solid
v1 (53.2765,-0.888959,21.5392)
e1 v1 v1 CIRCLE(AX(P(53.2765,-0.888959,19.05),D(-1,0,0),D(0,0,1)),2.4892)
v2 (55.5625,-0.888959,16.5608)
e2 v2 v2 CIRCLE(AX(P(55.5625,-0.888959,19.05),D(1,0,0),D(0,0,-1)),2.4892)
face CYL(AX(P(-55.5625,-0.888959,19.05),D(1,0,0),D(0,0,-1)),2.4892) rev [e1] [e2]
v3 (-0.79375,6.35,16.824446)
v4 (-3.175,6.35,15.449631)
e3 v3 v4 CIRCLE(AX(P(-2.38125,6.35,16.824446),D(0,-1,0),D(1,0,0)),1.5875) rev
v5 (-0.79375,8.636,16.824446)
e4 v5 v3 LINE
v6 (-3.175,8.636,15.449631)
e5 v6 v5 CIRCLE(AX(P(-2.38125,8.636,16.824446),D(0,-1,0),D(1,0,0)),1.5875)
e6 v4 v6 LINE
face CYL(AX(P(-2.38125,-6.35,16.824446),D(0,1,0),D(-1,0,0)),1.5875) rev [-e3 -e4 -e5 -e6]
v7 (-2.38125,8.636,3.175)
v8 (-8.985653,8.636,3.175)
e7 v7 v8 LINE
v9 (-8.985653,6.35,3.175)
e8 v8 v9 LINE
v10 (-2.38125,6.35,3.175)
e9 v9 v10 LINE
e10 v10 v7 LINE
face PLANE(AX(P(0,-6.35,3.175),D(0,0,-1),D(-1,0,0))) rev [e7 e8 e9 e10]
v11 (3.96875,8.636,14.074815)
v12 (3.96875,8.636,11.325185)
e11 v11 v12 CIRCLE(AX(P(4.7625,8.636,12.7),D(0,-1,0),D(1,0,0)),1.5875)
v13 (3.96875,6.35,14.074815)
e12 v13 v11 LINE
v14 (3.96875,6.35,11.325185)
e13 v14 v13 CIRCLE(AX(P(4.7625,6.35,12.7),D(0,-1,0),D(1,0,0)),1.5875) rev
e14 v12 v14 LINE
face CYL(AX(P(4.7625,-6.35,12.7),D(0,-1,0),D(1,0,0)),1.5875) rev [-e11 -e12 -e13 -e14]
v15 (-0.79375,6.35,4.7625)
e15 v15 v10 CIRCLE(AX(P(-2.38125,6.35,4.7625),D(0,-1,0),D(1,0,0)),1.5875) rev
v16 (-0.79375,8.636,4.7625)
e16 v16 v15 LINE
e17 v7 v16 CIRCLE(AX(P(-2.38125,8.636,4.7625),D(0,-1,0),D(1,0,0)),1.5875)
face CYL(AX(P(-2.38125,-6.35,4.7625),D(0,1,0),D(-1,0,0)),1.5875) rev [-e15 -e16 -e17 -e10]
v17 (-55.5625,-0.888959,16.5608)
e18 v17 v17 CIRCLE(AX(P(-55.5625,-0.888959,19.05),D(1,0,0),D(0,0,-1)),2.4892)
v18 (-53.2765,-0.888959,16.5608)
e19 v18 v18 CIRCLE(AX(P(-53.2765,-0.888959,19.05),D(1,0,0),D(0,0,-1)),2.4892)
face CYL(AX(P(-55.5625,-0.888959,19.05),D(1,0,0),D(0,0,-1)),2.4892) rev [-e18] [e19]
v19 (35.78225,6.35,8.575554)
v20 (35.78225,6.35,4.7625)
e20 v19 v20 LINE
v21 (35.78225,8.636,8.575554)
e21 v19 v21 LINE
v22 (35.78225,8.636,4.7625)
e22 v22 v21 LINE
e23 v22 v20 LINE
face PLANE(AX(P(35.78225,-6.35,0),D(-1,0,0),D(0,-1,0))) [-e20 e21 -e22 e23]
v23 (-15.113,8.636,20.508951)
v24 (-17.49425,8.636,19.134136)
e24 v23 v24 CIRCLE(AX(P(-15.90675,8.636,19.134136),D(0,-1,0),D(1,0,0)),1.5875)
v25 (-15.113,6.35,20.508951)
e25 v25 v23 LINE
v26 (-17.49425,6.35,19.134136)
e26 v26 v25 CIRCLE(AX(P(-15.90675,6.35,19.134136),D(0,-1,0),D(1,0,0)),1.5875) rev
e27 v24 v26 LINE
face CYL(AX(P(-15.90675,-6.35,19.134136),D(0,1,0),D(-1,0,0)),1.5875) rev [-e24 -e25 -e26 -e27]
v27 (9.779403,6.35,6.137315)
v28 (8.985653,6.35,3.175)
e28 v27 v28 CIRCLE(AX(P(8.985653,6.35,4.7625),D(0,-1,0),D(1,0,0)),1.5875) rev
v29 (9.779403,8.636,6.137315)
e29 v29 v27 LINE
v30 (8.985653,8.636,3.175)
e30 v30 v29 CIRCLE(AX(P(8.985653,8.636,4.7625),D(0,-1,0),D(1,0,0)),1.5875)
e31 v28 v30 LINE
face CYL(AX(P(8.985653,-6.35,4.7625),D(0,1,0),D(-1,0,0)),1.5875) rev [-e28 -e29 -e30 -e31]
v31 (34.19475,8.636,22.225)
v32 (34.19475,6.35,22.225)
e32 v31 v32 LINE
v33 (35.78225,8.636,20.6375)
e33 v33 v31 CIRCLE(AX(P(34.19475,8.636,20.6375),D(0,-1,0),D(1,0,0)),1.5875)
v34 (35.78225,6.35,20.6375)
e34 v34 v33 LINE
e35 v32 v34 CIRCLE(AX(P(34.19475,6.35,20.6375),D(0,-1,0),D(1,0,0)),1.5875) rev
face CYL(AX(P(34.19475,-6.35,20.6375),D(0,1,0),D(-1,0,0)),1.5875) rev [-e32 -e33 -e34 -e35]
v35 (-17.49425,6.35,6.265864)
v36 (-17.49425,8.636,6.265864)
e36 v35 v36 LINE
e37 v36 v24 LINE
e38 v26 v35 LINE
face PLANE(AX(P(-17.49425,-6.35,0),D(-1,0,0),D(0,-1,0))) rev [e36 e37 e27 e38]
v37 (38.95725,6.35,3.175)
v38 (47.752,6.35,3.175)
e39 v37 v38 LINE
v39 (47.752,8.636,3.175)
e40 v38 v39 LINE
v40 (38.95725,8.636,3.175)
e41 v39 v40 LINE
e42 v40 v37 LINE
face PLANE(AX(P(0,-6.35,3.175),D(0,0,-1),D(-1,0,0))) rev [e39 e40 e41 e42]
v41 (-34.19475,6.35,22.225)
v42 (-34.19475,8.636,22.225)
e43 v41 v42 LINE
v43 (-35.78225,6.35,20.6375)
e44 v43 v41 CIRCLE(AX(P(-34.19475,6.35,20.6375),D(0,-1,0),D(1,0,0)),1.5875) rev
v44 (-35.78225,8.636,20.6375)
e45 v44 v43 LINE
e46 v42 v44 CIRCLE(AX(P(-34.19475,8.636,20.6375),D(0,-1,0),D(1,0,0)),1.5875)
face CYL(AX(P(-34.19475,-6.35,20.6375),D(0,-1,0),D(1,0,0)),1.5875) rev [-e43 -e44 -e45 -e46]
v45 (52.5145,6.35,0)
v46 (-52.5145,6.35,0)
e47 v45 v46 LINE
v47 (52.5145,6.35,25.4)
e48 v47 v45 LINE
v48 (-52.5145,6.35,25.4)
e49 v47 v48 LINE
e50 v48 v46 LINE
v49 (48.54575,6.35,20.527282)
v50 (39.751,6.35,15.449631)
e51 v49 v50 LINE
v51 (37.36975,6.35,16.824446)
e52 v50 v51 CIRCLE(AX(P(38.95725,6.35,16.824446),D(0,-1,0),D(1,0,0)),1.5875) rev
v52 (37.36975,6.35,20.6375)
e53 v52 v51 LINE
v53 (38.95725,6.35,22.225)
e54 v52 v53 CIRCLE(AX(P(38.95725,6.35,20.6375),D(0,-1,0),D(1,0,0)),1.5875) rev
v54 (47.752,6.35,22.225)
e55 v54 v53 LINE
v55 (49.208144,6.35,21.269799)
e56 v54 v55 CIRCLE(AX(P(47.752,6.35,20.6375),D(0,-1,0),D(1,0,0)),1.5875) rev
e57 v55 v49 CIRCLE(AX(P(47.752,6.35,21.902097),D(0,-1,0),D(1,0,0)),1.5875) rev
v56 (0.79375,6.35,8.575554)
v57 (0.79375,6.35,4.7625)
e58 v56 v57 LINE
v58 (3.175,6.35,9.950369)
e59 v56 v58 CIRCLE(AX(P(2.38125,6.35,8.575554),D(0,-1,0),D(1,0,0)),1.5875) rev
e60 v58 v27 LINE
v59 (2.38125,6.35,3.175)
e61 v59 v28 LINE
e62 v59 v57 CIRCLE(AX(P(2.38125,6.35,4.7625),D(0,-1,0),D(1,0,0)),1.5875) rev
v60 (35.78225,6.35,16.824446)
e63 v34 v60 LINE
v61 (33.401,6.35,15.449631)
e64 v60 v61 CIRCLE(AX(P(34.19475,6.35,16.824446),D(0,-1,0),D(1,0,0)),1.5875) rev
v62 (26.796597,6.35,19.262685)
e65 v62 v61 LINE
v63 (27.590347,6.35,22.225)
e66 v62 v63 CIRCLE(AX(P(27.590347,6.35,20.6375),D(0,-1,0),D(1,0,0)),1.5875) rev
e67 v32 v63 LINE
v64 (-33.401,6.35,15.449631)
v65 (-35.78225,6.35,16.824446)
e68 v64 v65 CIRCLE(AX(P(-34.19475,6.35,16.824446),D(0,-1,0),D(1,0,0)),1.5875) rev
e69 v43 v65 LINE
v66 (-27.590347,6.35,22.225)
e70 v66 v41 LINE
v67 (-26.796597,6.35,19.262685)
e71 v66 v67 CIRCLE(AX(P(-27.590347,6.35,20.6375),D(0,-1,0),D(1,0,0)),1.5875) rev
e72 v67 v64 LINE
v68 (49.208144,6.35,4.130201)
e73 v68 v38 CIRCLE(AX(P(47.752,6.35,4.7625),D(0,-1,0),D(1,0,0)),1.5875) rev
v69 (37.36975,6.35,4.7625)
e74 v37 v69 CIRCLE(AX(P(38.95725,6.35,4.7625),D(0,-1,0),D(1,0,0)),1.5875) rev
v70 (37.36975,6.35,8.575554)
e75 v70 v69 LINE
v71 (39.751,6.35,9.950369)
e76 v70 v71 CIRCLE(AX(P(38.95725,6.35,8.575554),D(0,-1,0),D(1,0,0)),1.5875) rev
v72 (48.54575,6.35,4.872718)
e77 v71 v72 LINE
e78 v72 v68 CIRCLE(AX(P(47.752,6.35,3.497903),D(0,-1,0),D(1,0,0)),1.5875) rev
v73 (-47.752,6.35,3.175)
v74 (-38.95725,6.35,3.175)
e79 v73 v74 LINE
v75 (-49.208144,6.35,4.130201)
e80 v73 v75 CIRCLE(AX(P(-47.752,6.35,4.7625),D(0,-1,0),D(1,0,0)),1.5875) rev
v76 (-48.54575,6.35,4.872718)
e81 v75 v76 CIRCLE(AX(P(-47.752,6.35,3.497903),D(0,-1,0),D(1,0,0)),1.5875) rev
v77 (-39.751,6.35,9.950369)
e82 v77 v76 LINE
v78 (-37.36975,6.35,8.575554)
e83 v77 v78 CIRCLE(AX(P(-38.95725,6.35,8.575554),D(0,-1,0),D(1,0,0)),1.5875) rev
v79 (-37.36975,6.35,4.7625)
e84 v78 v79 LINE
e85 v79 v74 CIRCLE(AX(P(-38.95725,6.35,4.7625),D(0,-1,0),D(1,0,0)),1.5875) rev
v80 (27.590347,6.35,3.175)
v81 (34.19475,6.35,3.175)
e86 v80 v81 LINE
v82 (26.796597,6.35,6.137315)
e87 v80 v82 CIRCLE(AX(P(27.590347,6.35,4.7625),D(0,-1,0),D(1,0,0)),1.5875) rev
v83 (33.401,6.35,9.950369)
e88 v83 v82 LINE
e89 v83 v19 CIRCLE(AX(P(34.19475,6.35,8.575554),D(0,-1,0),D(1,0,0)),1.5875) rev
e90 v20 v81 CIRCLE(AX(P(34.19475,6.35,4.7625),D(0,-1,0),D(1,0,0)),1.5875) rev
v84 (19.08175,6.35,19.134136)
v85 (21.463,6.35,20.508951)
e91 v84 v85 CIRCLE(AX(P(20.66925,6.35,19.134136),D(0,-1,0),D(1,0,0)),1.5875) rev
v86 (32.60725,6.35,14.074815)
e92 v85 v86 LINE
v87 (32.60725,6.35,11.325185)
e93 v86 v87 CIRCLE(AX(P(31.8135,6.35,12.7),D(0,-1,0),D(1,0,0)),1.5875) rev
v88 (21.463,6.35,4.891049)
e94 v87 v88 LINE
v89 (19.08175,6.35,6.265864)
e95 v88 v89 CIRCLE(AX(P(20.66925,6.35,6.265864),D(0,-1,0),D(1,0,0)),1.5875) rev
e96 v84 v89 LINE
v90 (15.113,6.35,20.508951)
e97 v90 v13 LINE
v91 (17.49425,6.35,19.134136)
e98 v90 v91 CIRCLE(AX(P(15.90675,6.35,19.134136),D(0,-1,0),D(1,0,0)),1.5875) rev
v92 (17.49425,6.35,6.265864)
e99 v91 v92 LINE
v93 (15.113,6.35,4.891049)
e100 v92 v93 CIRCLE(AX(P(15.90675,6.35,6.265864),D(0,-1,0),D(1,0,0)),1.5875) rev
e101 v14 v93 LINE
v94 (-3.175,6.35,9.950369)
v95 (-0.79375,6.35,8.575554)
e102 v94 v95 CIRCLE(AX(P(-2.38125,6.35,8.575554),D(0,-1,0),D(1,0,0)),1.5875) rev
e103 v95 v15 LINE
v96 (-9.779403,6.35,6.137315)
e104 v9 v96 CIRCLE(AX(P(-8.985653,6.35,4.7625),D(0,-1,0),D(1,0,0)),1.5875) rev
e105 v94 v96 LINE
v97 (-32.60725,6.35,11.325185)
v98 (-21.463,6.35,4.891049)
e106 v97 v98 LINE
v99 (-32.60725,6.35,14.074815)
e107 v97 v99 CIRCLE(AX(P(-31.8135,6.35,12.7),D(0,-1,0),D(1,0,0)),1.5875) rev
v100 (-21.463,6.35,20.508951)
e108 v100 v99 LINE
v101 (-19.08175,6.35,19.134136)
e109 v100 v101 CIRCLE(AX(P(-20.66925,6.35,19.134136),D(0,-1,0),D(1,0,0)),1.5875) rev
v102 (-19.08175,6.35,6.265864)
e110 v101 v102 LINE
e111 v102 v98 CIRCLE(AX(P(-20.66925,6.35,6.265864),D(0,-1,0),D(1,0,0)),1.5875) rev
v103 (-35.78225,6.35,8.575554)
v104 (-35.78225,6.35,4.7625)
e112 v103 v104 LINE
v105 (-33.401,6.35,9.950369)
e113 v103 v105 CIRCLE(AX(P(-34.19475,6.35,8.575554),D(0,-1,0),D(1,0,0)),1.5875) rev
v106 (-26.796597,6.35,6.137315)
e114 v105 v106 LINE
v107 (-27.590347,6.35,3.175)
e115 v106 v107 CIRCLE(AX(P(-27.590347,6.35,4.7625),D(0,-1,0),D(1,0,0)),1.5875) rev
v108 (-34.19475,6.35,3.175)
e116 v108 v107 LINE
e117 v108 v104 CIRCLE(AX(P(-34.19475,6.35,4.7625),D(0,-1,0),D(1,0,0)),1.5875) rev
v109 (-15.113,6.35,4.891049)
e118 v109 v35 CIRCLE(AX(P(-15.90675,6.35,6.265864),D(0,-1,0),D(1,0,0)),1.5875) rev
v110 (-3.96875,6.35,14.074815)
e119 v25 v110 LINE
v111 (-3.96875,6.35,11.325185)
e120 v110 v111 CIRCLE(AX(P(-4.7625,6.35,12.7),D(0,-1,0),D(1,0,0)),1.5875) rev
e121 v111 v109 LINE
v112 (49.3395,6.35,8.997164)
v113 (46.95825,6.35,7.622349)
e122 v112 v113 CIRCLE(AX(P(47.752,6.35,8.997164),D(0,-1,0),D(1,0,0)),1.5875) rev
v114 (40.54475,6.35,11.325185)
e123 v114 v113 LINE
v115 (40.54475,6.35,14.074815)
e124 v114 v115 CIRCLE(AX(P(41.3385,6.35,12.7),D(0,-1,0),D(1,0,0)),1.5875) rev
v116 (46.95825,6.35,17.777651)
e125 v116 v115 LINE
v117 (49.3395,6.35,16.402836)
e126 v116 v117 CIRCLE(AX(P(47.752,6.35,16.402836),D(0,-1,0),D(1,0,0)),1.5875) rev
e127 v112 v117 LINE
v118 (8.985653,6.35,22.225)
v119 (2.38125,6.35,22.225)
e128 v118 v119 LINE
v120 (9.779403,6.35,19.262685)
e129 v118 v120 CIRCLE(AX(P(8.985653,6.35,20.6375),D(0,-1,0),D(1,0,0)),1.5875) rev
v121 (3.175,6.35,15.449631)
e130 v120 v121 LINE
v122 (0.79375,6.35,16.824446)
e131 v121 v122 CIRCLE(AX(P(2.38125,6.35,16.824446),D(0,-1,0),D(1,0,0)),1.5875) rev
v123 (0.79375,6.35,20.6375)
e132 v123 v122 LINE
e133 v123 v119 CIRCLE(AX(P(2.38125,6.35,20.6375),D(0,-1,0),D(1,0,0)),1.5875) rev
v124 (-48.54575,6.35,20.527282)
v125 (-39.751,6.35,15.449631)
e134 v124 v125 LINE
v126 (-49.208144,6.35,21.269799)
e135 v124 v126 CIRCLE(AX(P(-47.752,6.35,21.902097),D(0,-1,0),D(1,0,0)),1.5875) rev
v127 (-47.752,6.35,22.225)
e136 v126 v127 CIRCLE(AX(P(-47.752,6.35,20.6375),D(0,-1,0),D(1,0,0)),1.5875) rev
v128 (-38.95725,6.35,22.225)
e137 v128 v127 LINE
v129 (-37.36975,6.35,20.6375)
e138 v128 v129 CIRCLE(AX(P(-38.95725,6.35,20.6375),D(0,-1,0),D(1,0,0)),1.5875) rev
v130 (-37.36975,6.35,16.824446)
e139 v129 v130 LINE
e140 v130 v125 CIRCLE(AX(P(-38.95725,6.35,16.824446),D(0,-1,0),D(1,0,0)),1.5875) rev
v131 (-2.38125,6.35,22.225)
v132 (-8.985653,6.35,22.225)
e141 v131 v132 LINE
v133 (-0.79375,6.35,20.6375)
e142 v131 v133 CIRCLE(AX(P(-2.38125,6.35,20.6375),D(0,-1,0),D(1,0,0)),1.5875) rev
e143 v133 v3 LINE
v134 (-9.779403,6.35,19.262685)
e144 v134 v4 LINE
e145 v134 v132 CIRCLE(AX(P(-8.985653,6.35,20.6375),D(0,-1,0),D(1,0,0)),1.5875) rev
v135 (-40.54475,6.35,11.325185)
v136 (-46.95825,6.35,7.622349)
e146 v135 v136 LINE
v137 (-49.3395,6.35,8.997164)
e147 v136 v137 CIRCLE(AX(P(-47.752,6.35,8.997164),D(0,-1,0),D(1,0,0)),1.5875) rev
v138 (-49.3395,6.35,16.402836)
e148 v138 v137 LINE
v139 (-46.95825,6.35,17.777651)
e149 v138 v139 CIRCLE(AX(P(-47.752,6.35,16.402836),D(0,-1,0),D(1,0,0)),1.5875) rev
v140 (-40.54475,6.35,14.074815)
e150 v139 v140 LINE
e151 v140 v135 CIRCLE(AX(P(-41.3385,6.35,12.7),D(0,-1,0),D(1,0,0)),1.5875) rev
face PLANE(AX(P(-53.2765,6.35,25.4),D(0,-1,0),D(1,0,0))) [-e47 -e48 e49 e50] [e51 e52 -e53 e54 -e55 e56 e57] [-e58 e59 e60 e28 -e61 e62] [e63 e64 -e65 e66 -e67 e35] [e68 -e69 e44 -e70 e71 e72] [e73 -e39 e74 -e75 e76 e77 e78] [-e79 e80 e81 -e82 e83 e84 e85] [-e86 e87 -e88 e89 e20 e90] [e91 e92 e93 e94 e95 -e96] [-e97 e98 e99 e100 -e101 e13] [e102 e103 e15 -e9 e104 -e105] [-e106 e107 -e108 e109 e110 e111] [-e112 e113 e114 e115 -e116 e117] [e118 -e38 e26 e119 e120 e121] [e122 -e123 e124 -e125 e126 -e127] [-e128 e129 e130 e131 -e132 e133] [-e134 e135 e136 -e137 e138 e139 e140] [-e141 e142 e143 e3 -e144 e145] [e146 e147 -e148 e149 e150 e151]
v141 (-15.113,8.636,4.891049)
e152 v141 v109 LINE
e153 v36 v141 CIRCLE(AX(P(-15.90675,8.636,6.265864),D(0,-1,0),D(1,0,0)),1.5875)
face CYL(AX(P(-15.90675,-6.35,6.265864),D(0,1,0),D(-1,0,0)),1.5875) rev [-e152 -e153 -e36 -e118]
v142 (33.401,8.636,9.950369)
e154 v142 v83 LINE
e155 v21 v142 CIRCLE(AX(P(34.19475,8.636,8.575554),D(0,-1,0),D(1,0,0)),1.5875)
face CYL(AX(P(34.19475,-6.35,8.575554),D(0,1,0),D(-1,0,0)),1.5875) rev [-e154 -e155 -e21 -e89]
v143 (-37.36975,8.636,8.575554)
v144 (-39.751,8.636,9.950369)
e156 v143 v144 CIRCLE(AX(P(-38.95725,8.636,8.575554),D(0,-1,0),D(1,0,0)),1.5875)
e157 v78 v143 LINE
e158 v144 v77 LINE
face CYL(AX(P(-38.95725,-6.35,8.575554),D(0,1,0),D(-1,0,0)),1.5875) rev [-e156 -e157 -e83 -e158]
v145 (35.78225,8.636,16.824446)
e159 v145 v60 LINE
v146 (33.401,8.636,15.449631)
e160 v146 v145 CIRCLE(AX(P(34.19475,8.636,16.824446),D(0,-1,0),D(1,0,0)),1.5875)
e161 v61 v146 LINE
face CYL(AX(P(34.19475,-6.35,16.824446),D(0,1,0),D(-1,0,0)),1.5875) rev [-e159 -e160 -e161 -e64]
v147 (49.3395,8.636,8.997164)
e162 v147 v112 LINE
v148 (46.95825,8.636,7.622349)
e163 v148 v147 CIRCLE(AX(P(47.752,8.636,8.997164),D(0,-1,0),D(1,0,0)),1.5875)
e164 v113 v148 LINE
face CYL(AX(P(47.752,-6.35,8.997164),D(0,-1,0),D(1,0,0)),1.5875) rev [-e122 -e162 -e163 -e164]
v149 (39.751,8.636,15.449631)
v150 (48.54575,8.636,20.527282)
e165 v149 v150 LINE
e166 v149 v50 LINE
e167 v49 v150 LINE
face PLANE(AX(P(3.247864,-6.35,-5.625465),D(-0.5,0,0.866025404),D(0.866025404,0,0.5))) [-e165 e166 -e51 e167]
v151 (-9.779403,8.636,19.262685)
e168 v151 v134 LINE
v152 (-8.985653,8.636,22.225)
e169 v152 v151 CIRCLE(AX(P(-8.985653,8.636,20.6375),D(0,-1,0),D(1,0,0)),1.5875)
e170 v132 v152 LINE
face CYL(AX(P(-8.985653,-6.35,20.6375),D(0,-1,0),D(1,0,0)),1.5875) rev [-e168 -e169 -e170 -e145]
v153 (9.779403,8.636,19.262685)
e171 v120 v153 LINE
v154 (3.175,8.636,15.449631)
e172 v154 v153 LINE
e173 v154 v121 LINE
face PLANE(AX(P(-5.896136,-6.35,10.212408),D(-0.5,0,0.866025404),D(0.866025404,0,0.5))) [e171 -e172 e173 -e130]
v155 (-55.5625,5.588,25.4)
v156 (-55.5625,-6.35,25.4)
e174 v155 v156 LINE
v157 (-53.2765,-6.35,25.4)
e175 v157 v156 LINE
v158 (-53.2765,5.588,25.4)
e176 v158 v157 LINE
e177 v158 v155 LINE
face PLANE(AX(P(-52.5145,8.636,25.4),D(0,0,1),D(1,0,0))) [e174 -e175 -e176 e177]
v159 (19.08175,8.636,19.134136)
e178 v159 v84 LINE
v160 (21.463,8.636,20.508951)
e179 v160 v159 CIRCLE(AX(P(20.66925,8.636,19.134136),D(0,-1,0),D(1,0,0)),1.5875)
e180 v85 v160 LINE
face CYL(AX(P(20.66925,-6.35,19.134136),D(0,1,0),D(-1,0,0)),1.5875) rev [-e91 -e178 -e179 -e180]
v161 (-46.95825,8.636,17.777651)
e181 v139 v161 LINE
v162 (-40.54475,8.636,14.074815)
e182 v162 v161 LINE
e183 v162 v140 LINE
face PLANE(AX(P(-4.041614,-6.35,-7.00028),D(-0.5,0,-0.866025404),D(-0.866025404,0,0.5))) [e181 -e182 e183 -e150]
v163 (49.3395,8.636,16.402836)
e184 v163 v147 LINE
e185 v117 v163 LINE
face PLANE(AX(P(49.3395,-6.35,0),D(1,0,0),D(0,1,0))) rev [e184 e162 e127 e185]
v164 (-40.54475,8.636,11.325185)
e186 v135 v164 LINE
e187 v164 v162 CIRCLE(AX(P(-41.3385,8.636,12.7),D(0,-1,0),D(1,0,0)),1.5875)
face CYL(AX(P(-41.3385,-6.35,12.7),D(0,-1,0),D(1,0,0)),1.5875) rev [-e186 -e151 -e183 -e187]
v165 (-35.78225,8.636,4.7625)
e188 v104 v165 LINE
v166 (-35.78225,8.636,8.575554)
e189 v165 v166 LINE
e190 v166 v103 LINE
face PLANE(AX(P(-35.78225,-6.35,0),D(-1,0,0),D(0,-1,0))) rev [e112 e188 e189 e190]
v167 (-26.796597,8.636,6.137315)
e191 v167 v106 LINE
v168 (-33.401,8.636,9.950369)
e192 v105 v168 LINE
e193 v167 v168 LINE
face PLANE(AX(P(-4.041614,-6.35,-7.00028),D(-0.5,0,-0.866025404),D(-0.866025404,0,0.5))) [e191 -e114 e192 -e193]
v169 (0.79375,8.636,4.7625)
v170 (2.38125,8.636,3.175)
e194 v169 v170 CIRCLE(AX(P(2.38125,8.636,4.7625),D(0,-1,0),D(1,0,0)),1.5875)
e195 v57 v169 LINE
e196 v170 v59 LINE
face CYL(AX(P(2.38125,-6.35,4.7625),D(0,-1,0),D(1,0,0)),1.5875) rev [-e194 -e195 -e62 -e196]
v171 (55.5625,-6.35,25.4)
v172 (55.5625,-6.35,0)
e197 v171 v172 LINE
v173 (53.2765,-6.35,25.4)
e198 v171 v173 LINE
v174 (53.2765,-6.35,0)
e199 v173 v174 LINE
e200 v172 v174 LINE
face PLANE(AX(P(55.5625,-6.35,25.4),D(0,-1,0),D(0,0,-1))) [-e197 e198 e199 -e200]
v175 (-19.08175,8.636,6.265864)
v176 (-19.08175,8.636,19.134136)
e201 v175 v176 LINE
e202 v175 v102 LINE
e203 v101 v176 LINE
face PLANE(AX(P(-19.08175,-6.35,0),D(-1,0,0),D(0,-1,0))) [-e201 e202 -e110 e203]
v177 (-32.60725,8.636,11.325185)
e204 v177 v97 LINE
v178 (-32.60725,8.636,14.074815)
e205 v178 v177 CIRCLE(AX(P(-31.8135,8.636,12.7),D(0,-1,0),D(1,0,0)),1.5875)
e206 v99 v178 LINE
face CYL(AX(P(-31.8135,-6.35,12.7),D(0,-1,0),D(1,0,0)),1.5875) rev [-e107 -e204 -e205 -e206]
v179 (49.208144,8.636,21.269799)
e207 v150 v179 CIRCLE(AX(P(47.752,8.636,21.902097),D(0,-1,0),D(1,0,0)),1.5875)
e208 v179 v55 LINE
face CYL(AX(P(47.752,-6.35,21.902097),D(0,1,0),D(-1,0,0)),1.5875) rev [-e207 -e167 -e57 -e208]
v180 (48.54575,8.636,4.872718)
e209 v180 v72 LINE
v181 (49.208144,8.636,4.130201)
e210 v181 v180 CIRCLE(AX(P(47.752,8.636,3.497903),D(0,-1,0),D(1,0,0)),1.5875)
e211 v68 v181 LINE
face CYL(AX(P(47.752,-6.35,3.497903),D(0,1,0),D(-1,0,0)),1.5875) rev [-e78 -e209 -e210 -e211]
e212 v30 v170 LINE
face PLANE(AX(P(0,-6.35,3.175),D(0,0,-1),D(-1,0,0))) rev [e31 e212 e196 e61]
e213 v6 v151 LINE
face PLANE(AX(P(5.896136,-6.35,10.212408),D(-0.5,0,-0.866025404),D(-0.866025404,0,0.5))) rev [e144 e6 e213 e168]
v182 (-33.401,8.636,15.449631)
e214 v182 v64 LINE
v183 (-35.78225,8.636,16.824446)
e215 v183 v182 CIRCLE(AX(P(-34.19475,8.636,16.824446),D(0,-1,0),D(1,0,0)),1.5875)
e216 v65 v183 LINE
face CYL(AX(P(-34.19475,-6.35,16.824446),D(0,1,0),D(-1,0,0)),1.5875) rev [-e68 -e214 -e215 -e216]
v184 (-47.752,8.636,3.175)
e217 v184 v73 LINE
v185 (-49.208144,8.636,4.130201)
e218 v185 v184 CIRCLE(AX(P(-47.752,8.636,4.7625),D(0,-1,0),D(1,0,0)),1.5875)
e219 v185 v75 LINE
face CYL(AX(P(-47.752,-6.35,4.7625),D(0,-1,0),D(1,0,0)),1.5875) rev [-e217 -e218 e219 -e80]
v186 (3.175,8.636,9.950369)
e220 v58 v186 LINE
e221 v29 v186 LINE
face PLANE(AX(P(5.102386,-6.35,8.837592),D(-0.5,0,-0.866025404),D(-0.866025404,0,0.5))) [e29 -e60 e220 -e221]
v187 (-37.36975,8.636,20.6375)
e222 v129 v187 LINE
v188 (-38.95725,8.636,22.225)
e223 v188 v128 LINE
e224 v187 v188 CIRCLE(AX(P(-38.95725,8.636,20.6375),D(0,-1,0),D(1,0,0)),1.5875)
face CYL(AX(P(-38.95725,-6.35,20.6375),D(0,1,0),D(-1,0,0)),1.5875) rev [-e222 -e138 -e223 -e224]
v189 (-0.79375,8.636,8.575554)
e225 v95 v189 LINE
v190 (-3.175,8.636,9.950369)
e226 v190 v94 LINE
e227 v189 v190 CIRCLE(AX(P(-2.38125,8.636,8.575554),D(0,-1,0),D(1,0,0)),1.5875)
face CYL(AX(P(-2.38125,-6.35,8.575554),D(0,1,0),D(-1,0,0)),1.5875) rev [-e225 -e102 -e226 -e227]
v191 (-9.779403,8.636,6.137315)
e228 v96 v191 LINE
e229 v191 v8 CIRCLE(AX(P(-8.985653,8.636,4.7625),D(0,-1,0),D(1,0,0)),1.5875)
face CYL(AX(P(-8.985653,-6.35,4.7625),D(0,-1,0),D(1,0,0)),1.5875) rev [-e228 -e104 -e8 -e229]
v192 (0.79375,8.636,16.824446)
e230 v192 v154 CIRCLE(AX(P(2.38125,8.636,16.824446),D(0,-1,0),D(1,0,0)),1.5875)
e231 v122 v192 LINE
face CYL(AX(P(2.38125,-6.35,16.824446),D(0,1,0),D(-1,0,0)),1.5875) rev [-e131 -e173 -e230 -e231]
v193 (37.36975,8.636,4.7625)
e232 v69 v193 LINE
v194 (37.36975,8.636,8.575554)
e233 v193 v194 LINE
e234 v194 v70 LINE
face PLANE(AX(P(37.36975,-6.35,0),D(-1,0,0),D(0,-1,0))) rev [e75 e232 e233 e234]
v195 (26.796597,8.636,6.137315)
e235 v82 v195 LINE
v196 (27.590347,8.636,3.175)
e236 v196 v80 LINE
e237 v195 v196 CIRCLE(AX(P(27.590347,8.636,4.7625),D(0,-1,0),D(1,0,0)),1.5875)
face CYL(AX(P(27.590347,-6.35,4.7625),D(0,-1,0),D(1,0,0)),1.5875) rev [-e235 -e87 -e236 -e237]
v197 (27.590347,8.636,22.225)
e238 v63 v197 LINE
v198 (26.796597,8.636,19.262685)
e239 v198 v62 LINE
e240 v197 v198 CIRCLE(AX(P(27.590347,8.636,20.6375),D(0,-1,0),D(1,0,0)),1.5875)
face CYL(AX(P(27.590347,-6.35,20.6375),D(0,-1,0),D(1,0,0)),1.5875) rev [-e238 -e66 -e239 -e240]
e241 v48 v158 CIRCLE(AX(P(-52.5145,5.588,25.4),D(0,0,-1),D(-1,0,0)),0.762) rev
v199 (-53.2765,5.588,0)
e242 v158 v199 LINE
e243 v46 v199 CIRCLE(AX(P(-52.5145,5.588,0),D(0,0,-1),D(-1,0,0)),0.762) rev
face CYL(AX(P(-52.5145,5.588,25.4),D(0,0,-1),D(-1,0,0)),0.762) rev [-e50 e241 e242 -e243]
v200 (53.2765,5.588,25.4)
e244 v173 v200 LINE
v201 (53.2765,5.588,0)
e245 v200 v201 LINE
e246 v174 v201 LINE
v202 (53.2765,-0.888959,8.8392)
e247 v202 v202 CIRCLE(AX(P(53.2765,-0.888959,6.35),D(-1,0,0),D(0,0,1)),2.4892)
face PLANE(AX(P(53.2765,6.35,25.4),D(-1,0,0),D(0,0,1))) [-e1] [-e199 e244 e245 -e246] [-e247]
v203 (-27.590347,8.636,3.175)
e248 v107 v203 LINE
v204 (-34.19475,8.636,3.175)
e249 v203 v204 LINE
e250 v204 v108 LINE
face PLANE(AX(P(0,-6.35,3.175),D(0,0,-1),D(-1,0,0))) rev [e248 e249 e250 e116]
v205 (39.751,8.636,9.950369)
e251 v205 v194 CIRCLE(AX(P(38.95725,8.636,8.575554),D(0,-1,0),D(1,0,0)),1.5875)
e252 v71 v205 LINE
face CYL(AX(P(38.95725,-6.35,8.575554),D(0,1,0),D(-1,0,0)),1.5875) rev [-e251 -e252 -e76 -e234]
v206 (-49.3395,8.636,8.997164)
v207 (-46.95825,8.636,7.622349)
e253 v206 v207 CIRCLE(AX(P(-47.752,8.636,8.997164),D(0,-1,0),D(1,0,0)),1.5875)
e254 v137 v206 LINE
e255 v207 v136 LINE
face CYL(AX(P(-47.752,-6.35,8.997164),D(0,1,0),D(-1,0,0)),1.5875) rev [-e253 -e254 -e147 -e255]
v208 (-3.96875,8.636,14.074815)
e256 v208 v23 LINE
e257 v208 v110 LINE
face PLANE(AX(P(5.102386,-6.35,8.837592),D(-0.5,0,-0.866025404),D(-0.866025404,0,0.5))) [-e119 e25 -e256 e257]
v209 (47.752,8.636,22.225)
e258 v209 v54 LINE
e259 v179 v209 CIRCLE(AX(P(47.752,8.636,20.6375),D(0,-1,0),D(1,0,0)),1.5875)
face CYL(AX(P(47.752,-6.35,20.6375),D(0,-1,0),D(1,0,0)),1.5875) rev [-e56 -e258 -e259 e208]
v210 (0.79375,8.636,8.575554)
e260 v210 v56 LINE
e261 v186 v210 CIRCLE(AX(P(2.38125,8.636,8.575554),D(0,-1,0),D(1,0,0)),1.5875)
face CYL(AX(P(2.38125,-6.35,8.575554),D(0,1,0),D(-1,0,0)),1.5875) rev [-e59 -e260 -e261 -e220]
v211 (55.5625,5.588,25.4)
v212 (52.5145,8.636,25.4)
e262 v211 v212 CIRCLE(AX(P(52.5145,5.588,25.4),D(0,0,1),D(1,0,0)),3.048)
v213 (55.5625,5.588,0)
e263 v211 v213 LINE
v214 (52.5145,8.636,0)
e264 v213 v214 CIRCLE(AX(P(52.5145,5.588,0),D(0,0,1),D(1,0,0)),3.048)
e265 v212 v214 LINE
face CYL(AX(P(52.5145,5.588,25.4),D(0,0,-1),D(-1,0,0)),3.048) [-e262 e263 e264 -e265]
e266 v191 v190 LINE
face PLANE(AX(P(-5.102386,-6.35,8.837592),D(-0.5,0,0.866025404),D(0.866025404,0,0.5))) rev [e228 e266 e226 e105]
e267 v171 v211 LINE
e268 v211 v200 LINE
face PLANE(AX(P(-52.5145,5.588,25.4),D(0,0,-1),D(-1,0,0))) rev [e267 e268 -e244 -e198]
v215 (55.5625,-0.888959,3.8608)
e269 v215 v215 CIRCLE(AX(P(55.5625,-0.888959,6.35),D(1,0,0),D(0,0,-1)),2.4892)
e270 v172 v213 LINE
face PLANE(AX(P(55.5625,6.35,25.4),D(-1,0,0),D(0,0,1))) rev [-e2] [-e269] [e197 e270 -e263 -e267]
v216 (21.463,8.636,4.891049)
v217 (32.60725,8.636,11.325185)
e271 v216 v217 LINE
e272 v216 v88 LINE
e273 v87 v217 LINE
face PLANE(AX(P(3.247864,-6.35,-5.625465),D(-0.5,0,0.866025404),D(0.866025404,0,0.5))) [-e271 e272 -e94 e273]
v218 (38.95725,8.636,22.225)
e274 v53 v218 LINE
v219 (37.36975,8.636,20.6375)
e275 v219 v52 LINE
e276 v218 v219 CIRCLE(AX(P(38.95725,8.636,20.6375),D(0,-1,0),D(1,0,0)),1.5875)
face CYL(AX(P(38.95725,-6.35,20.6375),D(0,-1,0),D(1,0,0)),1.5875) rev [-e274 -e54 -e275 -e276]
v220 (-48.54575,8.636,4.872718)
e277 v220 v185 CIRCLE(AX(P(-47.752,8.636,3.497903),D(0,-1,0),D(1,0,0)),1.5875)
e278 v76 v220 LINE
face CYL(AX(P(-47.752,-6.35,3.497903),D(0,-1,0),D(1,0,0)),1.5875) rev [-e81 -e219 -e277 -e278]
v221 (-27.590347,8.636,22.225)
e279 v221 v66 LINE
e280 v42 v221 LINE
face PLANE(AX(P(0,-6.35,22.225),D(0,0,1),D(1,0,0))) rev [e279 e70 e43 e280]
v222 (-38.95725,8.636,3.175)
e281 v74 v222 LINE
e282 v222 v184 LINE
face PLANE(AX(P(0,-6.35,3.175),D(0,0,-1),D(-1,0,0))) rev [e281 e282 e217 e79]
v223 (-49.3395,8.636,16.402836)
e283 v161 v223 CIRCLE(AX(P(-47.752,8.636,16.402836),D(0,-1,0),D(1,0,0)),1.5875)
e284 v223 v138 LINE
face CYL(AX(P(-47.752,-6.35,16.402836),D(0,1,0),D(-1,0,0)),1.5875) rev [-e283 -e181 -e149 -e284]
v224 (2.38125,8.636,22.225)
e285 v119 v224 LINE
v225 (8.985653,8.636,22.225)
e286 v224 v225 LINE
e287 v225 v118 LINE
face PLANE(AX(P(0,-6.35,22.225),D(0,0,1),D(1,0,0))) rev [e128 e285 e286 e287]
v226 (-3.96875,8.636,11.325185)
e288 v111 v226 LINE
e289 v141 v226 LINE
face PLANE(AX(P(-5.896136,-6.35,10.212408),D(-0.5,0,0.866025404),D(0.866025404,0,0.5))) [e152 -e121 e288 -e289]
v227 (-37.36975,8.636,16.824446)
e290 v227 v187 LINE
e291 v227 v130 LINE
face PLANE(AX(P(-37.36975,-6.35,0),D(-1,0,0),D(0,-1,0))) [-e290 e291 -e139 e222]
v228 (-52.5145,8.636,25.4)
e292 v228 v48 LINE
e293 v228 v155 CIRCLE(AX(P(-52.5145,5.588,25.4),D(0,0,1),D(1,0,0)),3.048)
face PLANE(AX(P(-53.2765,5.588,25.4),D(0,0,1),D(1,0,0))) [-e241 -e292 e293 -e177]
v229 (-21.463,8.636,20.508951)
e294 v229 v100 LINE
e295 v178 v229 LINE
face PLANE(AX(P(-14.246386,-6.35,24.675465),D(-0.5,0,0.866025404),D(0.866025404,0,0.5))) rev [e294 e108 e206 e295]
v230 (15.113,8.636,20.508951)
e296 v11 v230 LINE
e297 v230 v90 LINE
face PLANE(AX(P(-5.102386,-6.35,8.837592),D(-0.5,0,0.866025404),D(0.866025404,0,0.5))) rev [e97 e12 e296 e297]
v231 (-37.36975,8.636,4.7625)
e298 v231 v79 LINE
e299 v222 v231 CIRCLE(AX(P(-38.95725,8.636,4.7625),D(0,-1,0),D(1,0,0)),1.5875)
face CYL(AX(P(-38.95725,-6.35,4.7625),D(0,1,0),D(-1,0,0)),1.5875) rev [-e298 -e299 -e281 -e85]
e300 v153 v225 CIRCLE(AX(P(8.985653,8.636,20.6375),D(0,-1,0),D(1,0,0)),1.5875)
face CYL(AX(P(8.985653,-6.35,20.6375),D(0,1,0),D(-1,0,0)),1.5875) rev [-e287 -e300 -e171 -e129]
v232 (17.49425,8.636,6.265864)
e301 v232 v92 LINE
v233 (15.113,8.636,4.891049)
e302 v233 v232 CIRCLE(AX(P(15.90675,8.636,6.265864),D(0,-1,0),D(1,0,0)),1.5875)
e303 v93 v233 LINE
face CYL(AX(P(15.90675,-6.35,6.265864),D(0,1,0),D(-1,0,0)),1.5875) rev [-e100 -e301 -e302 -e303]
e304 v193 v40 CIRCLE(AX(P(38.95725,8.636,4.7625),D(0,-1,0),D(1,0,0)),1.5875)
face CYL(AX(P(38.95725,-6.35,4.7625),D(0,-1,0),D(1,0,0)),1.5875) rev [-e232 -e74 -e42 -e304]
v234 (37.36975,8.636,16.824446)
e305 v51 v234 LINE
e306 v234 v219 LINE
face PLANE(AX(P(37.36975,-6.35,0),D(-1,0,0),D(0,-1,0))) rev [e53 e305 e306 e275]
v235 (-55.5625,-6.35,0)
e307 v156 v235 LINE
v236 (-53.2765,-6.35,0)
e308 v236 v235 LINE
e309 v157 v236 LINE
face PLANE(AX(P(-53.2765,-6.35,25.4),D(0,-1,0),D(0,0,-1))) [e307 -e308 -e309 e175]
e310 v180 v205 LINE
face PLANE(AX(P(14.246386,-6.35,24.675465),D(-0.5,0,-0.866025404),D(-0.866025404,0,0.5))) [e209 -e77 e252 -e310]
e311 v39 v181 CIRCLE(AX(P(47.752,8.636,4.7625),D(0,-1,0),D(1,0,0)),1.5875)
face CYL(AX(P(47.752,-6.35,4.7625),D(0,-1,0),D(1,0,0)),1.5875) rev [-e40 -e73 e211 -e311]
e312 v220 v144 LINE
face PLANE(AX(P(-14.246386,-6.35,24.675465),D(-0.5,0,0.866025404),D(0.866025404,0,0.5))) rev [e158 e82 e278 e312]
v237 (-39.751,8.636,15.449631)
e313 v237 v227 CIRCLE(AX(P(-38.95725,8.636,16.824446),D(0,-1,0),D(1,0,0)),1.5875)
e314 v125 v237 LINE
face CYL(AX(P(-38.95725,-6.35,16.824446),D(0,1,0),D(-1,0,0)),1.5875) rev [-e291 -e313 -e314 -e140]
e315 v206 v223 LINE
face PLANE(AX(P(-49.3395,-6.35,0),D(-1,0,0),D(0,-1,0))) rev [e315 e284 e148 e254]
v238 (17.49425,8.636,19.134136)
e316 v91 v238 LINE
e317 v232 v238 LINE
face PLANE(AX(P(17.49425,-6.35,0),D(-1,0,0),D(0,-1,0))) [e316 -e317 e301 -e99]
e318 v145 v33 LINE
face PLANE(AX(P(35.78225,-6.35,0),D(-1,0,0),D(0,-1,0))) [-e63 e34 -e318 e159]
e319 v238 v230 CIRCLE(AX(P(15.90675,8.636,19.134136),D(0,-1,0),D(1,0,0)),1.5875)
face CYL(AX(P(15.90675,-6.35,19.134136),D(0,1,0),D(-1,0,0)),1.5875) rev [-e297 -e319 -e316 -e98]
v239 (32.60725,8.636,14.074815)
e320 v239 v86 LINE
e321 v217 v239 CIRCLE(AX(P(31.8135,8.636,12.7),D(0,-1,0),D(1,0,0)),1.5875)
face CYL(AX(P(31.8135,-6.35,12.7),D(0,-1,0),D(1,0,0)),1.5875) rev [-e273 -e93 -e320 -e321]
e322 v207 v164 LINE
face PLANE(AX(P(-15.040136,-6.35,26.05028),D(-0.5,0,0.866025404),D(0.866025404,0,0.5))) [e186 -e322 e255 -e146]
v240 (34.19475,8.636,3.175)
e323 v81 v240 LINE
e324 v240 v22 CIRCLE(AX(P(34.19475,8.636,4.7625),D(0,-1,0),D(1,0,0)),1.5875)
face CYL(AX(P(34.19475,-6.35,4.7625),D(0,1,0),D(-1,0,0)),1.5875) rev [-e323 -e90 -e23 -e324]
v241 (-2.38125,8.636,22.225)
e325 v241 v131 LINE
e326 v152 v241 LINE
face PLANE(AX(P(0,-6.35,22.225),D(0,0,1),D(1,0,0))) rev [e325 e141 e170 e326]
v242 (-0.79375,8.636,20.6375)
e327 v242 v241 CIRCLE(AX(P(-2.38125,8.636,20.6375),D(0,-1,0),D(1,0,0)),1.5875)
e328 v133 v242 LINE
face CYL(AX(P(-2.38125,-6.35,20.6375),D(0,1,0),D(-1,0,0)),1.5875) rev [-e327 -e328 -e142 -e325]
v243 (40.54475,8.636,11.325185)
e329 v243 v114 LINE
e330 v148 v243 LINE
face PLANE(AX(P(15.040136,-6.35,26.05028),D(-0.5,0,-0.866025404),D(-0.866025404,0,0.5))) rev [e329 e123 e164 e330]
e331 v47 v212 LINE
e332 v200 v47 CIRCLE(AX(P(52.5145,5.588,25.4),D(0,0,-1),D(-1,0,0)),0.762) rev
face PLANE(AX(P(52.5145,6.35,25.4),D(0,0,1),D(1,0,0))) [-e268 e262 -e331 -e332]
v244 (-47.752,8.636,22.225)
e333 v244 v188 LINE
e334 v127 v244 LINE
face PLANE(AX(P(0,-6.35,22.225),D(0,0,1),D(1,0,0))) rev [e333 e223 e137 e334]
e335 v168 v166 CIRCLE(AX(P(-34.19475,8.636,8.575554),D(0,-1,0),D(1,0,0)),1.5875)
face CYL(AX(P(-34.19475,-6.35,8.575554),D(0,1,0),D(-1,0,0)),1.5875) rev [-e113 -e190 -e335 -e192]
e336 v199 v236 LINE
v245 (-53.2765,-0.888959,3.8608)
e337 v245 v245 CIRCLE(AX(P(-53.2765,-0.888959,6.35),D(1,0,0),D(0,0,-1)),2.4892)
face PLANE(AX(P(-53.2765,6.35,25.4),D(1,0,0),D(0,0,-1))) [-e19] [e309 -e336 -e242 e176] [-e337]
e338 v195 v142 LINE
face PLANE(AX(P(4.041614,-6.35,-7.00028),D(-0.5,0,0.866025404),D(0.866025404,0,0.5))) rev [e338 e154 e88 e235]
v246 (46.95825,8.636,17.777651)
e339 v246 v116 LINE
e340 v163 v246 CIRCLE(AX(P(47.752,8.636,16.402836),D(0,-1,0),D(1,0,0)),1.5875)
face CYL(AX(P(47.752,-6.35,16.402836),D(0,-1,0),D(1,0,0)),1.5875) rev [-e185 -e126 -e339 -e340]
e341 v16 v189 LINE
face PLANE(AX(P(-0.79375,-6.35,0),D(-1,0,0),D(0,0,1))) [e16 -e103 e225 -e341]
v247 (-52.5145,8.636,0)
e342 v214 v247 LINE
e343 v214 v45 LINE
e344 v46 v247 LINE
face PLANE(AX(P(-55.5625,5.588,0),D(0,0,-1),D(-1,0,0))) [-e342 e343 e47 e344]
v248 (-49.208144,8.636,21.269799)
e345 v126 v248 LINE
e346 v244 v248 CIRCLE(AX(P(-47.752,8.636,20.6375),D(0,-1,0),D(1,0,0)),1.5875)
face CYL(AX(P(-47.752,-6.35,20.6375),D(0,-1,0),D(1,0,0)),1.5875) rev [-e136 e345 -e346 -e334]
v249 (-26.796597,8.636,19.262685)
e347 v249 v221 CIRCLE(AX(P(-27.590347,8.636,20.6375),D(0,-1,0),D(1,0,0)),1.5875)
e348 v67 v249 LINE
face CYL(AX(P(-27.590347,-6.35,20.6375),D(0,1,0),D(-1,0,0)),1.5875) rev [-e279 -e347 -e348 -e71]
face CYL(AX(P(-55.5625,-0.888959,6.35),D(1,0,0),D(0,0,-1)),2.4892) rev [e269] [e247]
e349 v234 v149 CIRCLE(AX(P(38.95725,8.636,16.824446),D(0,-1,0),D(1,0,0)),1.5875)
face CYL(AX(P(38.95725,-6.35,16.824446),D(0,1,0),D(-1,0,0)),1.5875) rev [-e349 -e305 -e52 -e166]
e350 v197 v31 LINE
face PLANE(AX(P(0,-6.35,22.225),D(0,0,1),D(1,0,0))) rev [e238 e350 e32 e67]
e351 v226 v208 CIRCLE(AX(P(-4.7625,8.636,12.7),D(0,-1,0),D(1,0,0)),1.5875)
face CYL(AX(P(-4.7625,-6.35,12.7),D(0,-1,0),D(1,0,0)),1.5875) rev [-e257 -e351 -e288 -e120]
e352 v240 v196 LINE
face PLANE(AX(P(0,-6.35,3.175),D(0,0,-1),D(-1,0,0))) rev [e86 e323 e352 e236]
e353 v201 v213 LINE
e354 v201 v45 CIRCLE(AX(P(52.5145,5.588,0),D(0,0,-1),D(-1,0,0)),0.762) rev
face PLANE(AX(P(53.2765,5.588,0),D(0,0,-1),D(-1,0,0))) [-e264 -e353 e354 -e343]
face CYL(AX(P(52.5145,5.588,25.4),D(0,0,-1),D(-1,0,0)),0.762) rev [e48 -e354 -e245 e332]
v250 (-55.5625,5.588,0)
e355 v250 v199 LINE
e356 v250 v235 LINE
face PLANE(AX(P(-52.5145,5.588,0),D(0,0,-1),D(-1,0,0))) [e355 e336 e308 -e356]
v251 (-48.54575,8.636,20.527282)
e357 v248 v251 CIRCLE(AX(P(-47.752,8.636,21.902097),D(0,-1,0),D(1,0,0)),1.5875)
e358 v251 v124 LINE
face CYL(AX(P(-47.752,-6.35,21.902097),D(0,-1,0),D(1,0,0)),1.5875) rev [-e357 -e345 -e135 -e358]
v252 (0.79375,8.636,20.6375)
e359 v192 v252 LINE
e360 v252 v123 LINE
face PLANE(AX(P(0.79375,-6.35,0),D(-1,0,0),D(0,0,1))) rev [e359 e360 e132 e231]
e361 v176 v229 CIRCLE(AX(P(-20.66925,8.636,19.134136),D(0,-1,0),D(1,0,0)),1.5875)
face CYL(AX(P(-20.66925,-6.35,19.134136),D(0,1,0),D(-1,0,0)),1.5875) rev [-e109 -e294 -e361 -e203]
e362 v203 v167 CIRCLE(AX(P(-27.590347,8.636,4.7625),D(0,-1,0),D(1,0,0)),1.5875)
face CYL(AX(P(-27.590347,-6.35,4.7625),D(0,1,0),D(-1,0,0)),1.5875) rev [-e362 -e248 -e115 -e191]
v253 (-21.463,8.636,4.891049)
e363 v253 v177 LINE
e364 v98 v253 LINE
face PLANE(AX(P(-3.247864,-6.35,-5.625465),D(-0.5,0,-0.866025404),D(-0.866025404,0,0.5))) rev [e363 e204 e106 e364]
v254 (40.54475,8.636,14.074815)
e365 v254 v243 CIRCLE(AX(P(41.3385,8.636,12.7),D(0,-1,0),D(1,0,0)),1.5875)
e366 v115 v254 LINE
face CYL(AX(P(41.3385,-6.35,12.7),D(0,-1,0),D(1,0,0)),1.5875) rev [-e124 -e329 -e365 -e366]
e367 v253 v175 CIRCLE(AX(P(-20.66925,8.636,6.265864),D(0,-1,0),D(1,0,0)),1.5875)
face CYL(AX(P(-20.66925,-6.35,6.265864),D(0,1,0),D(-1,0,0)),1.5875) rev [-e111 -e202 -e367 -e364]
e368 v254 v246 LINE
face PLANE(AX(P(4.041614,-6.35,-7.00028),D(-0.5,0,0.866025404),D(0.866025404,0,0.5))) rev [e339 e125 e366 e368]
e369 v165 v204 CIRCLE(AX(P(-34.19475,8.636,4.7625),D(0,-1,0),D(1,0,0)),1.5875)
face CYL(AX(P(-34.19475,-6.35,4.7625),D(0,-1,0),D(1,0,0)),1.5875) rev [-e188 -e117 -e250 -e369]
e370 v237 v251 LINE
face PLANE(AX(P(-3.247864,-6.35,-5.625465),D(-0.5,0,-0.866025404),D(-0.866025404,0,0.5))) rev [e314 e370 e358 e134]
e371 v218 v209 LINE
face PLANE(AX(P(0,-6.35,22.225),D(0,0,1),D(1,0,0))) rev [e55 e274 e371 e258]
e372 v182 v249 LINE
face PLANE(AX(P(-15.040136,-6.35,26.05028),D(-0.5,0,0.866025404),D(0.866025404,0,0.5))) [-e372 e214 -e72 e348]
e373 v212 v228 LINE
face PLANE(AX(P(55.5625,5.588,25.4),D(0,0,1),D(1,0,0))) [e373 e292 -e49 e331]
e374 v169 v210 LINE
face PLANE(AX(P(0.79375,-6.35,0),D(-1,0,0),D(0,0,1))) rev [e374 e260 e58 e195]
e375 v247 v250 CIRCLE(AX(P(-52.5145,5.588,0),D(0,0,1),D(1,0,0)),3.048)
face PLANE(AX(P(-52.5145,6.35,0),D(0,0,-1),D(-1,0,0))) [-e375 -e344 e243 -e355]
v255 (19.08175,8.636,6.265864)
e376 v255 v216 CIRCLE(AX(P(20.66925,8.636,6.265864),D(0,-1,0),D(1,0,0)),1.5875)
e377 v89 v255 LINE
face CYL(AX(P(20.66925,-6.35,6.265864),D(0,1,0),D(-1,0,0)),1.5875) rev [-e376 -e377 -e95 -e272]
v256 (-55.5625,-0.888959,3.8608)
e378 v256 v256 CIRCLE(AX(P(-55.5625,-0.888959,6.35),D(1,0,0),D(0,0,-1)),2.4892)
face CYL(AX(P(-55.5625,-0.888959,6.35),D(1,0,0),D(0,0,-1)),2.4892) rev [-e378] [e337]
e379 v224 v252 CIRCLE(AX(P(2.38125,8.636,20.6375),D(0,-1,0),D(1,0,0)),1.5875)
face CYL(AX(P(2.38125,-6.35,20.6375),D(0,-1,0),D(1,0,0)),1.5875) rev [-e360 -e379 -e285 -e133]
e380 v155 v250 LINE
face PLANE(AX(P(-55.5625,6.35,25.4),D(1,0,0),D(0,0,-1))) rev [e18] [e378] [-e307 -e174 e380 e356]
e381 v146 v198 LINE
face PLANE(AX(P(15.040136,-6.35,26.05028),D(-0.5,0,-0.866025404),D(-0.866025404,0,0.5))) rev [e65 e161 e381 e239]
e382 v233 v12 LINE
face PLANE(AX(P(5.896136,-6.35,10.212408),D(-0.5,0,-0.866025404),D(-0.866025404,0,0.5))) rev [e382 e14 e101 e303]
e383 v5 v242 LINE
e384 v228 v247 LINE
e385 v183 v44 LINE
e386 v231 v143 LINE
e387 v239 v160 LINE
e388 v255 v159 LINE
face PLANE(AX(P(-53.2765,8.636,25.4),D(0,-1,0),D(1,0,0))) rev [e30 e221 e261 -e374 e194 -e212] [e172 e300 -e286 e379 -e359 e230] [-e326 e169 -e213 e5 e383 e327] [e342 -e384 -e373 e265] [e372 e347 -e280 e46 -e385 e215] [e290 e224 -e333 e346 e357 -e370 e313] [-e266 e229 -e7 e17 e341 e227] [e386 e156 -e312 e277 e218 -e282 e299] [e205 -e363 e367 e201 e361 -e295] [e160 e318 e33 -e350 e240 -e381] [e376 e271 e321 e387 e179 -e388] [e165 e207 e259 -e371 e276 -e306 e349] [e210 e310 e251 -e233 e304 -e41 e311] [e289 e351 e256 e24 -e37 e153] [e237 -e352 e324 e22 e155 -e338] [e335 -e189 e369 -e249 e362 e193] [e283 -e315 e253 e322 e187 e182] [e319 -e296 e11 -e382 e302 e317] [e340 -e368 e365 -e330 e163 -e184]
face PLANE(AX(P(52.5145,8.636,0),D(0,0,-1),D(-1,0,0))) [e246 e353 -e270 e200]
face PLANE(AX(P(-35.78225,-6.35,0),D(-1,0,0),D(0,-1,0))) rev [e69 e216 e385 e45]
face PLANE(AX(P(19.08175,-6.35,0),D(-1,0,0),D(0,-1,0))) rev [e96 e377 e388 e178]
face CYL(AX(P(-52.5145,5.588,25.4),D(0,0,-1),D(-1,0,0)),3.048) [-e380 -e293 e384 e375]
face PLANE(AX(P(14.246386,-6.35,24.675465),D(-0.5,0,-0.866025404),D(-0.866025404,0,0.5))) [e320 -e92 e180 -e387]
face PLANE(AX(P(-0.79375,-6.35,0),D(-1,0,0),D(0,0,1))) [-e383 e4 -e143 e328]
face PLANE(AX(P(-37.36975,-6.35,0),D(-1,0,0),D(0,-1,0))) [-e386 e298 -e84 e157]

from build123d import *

# Parameters (mm, degrees)
BASE_FLANGE1_DEPTH      = 25.4
CUT_EXTRUDE1_DEPTH      = 62.700339563
CUT_EXTRUDE1_DEPTH_BACK = 62.700339563
SKETCH6_R               = 2.4892
CUT_EXTRUDE4_DEPTH      = 63.904146145
FILLET1_R               = 1.5875


# Sheet-metal steps are written as plain solids
with BuildPart() as part:
    # Sketch1 → Base-Flange1 (new body)
    with BuildSketch(Plane.XY):
        with BuildLine():
            Line((-53.2765, -6.35), (-53.2765, 5.588))
            ThreePointArc((-53.2765, 5.588), (-53.053315367, 6.126815367), (-52.5145, 6.35))
            Line((-52.5145, 6.35), (52.5145, 6.35))
            ThreePointArc((52.5145, 6.35), (53.053315367, 6.126815367), (53.2765, 5.588))
            Line((53.2765, 5.588), (53.2765, -6.35))
            Line((53.2765, -6.35), (55.5625, -6.35))
            Line((55.5625, -6.35), (55.5625, 5.588))
            ThreePointArc((55.5625, 5.588), (54.669761469, 7.743261469), (52.5145, 8.636))
            Line((52.5145, 8.636), (-52.5145, 8.636))
            ThreePointArc((-52.5145, 8.636), (-54.669761469, 7.743261469), (-55.5625, 5.588))
            Line((-55.5625, 5.588), (-55.5625, -6.35))
            Line((-55.5625, -6.35), (-53.2765, -6.35))
        make_face()
    extrude(amount=BASE_FLANGE1_DEPTH)

    # Sketch6 → Cut-Extrude1 (cut, two sides: drawn at the far end of the back side and taken through both)
    with BuildSketch(Plane(origin=(0, 0, 0), x_dir=(0, 0, -1), z_dir=(1, 0, 0)).offset(-CUT_EXTRUDE1_DEPTH_BACK)):
        with Locations((19.05, -0.888959106)):
            Circle(SKETCH6_R)
        with Locations((6.35, -0.888959106)):
            Circle(SKETCH6_R)
        with Locations((-6.35, -0.888959106)):
            Circle(SKETCH6_R)
        with Locations((-19.05, -0.888959106)):
            Circle(SKETCH6_R)
    extrude(amount=CUT_EXTRUDE1_DEPTH + CUT_EXTRUDE1_DEPTH_BACK, mode=Mode.SUBTRACT)

    # Sketch8 → Cut-Extrude4 (cut, through all)
    with BuildSketch(Plane(origin=(0, 8.636, 0), x_dir=(1, 0, 0), z_dir=(0, 1, 0))):
        Polygon((49.3395, -19.152466608), (49.3395, -6.247533392), (38.1635, -12.7), align=None)
        Polygon((49.3395, -22.225), (49.3395, -20.985553713), (37.36975, -14.074815329), (37.36975, -22.225), align=None)
        Polygon((35.78225, -22.225), (35.78225, -14.074815329), (21.665716058, -22.225), align=None)
        Polygon((19.08175, -21.883766394), (34.9885, -12.7), (19.08175, -3.516233606), align=None)
        Polygon((35.78225, -11.325184671), (35.78225, -3.175), (21.665716058, -3.175), align=None)
        Polygon((37.36975, -11.325184671), (49.3395, -4.414446287), (49.3395, -3.175), (37.36975, -3.175), align=None)
        Polygon((17.49425, -21.883766394), (17.49425, -3.516233606), (1.5875, -12.7), align=None)
        Polygon((0.79375, -22.225), (14.910283942, -22.225), (0.79375, -14.074815329), align=None)
        Polygon((0.79375, -11.325184671), (14.910283942, -3.175), (0.79375, -3.175), align=None)
        Polygon((-0.79375, -11.325184671), (-0.79375, -3.175), (-14.910283942, -3.175), align=None)
        Polygon((-17.49425, -21.883766394), (-1.5875, -12.7), (-17.49425, -3.516233606), align=None)
        Polygon((-14.910283942, -22.225), (-0.79375, -22.225), (-0.79375, -14.074815329), align=None)
        Polygon((-19.08175, -21.883766394), (-19.08175, -3.516233606), (-34.9885, -12.7), align=None)
        Polygon((-35.78225, -22.225), (-21.665716058, -22.225), (-35.78225, -14.074815329), align=None)
        Polygon((-35.78225, -11.325184671), (-21.665716058, -3.175), (-35.78225, -3.175), align=None)
        Polygon((-37.36975, -11.325184671), (-37.36975, -3.175), (-49.3395, -3.175), (-49.3395, -4.414446287), align=None)
        Polygon((-49.3395, -19.152466608), (-38.1635, -12.7), (-49.3395, -6.247533392), align=None)
        Polygon((-49.3395, -22.225), (-37.36975, -22.225), (-37.36975, -14.074815329), (-49.3395, -20.985553713), align=None)
    extrude(amount=-CUT_EXTRUDE4_DEPTH, mode=Mode.SUBTRACT)

    # Fillet1
    # the kernel refuses this fillet: 1.5875 mm, written as the material it adds along each edge
    with BuildSketch(Plane(origin=(37.36975, 8.636, 3.175), x_dir=(0, 0, 1), z_dir=(0, -1, 0)), Plane(origin=(49.3395, 8.636, 3.175), x_dir=(-1, 0, 0), z_dir=(0, -1, 0)), Plane(origin=(49.3395, 8.636, 22.225), x_dir=(0, 0, -1), z_dir=(0, -1, 0)), Plane(origin=(35.78225, 8.636, 22.225), x_dir=(0, 0, -1), z_dir=(0, -1, 0)), Plane(origin=(35.78225, 8.636, 3.175), x_dir=(-1, 0, 0), z_dir=(0, -1, 0)), Plane(origin=(-49.3395, 8.636, 3.175), x_dir=(0, 0, 1), z_dir=(0, -1, 0)), Plane(origin=(-37.36975, 8.636, 3.175), x_dir=(-1, 0, 0), z_dir=(0, -1, 0)), Plane(origin=(-0.79375, 8.636, 3.175), x_dir=(-1, 0, 0), z_dir=(0, -1, 0)), Plane(origin=(-0.79375, 8.636, 22.225), x_dir=(0, 0, -1), z_dir=(0, -1, 0)), Plane(origin=(-37.36975, 8.636, 22.225), x_dir=(0, 0, -1), z_dir=(0, -1, 0)), Plane(origin=(-49.3395, 8.636, 22.225), x_dir=(1, 0, 0), z_dir=(0, -1, 0))) as fillet1_piece_1:
        with BuildLine():
            CenterArc((FILLET1_R, -FILLET1_R), FILLET1_R, 90, 90)
            Line((0, -FILLET1_R), (0, 0))
            Line((0, 0), (FILLET1_R, 0))
        make_face()
    extrude(amount=2.286)
    with BuildSketch(Plane(origin=(49.3395, 8.636, 4.414446287), x_dir=(0, 0, -1), z_dir=(0, -1, 0)), Plane(origin=(49.3395, 8.636, 20.985553713), x_dir=(-0.8660254037844429, 0, -0.4999999999999925), z_dir=(0, -1, 0)), Plane(origin=(-49.3395, 8.636, 4.414446287), x_dir=(0.8660254037844405, 0, 0.4999999999999969), z_dir=(0, -1, 0)), Plane(origin=(-49.3395, 8.636, 20.985553713), x_dir=(0, 0, 1), z_dir=(0, -1, 0))) as fillet1_piece_2:
        with BuildLine():
            CenterArc((FILLET1_R * 0.57735026919, -FILLET1_R), FILLET1_R, 90, 60)
            Line((-FILLET1_R * 0.288675134595, -FILLET1_R * 0.5), (0, 0))
            Line((0, 0), (FILLET1_R * 0.57735026919, 0))
        make_face()
    extrude(amount=2.286)
    with BuildSketch(Plane(origin=(37.36975, 8.636, 11.325184671), x_dir=(0, 0, -1), z_dir=(0, -1, 0)), Plane(origin=(1.5875, 8.636, 12.7), x_dir=(0.8660254037844406, 0, -0.4999999999999966), z_dir=(0, -1, 0)), Plane(origin=(35.78225, 8.636, 11.325184671), x_dir=(-0.8660254037844403, 0, -0.49999999999999717), z_dir=(0, -1, 0)), Plane(origin=(19.08175, 8.636, 21.883766394), x_dir=(0, 0, -1), z_dir=(0, -1, 0)), Plane(origin=(-37.36975, 8.636, 11.325184671), x_dir=(-0.8660254037844397, 0, -0.49999999999999817), z_dir=(0, -1, 0)), Plane(origin=(-49.3395, 8.636, 19.152466608), x_dir=(0, 0, -1), z_dir=(0, -1, 0)), Plane(origin=(-17.49425, 8.636, 21.883766394), x_dir=(0, 0, -1), z_dir=(0, -1, 0)), Plane(origin=(-0.79375, 8.636, 11.325184671), x_dir=(-0.8660254037844397, 0, -0.4999999999999983), z_dir=(0, -1, 0)), Plane(origin=(-0.79375, 8.636, 14.074815329), x_dir=(0, 0, 1), z_dir=(0, -1, 0)), Plane(origin=(-34.9885, 8.636, 12.7), x_dir=(0.8660254037844405, 0, -0.49999999999999667), z_dir=(0, -1, 0)), Plane(origin=(-37.36975, 8.636, 14.074815329), x_dir=(0, 0, 1), z_dir=(0, -1, 0)), Plane(origin=(49.3395, 8.636, 19.152466608), x_dir=(-0.8660254037844397, 0, -0.49999999999999817), z_dir=(0, -1, 0))) as fillet1_piece_3:
        with BuildLine():
            CenterArc((FILLET1_R * 1.73205080757, FILLET1_R), FILLET1_R, 150, 120)
            Line((FILLET1_R * 0.866025403784, FILLET1_R * 1.5), (0, 0))
            Line((0, 0), (FILLET1_R * 1.73205080757, 0))
        make_face()
    extrude(amount=2.286)
    with BuildSketch(Plane(origin=(17.49425, 8.636, 3.516233606), x_dir=(-0.8660254037844396, 0, 0.49999999999999817), z_dir=(0, -1, 0)), Plane(origin=(17.49425, 8.636, 21.883766394), x_dir=(0, 0, -1), z_dir=(0, -1, 0)), Plane(origin=(0.79375, 8.636, 14.074815329), x_dir=(0, 0, 1), z_dir=(0, -1, 0)), Plane(origin=(0.79375, 8.636, 11.325184671), x_dir=(0.8660254037844398, 0, -0.4999999999999979), z_dir=(0, -1, 0)), Plane(origin=(37.36975, 8.636, 14.074815329), x_dir=(0, 0, 1), z_dir=(0, -1, 0)), Plane(origin=(35.78225, 8.636, 14.074815329), x_dir=(-0.8660254037844395, 0, 0.4999999999999986), z_dir=(0, -1, 0)), Plane(origin=(19.08175, 8.636, 3.516233606), x_dir=(0, 0, 1), z_dir=(0, -1, 0)), Plane(origin=(34.9885, 8.636, 12.7), x_dir=(-0.866025403784439, 0, -0.4999999999999993), z_dir=(0, -1, 0)), Plane(origin=(-38.1635, 8.636, 12.7), x_dir=(-0.8660254037844394, 0, -0.4999999999999986), z_dir=(0, -1, 0)), Plane(origin=(-49.3395, 8.636, 6.247533392), x_dir=(0, 0, 1), z_dir=(0, -1, 0)), Plane(origin=(-35.78225, 8.636, 11.325184671), x_dir=(0.86602540378444, 0, -0.49999999999999767), z_dir=(0, -1, 0)), Plane(origin=(-35.78225, 8.636, 14.074815329), x_dir=(0, 0, 1), z_dir=(0, -1, 0)), Plane(origin=(-17.49425, 8.636, 3.516233606), x_dir=(0, 0, 1), z_dir=(0, -1, 0)), Plane(origin=(-1.5875, 8.636, 12.7), x_dir=(-0.8660254037844406, 0, -0.4999999999999966), z_dir=(0, -1, 0)), Plane(origin=(-19.08175, 8.636, 3.516233606), x_dir=(-0.8660254037844397, 0, 0.499999999999998), z_dir=(0, -1, 0)), Plane(origin=(-19.08175, 8.636, 21.883766394), x_dir=(0, 0, -1), z_dir=(0, -1, 0)), Plane(origin=(49.3395, 8.636, 6.247533392), x_dir=(-0.8660254037844402, 0, 0.4999999999999975), z_dir=(0, -1, 0)), Plane(origin=(38.1635, 8.636, 12.7), x_dir=(0.8660254037844394, 0, 0.4999999999999986), z_dir=(0, -1, 0))) as fillet1_piece_4:
        with BuildLine():
            CenterArc((FILLET1_R * 1.73205080757, -FILLET1_R), FILLET1_R, 90, 120)
            Line((FILLET1_R * 0.866025403784, -FILLET1_R * 1.5), (0, 0))
            Line((0, 0), (FILLET1_R * 1.73205080757, 0))
        make_face()
    extrude(amount=2.286)
    with BuildSketch(Plane(origin=(14.910283942, 8.636, 22.225), x_dir=(-0.8660254037844399, 0, -0.49999999999999767), z_dir=(0, -1, 0)), Plane(origin=(14.910283942, 8.636, 3.175), x_dir=(-1, 0, 0), z_dir=(0, -1, 0)), Plane(origin=(21.665716058, 8.636, 3.175), x_dir=(0.8660254037844398, 0, 0.4999999999999979), z_dir=(0, -1, 0)), Plane(origin=(-21.665716058, 8.636, 3.175), x_dir=(-1, 0, 0), z_dir=(0, -1, 0)), Plane(origin=(-21.665716058, 8.636, 22.225), x_dir=(-0.8660254037844397, 0, -0.49999999999999806), z_dir=(0, -1, 0)), Plane(origin=(-14.910283942, 8.636, 3.175), x_dir=(0.8660254037844397, 0, 0.499999999999998), z_dir=(0, -1, 0)), Plane(origin=(-14.910283942, 8.636, 22.225), x_dir=(1, 0, 0), z_dir=(0, -1, 0))) as fillet1_piece_5:
        with BuildLine():
            CenterArc((FILLET1_R * 3.73205080757, -FILLET1_R), FILLET1_R, 90, 150)
            Line((FILLET1_R * 3.23205080757, -FILLET1_R * 1.86602540378), (0, 0))
            Line((0, 0), (FILLET1_R * 3.73205080757, 0))
        make_face()
    extrude(amount=2.286)
    with BuildSketch(Plane(origin=(0.79375, 8.636, 22.225), x_dir=(0, 0, -1), z_dir=(0, -1, 0)), Plane(origin=(0.79375, 8.636, 3.175), x_dir=(1, 0, 0), z_dir=(0, -1, 0)), Plane(origin=(37.36975, 8.636, 22.225), x_dir=(0, 0, -1), z_dir=(0, -1, 0)), Plane(origin=(-35.78225, 8.636, 3.175), x_dir=(1, 0, 0), z_dir=(0, -1, 0)), Plane(origin=(-35.78225, 8.636, 22.225), x_dir=(0, 0, -1), z_dir=(0, -1, 0))) as fillet1_piece_6:
        with BuildLine():
            CenterArc((FILLET1_R, FILLET1_R), FILLET1_R, 180, 90)
            Line((0, FILLET1_R), (0, 0))
            Line((0, 0), (FILLET1_R, 0))
        make_face()
    extrude(amount=2.286)
    with BuildSketch(Plane(origin=(21.665716058, 8.636, 22.225), x_dir=(0.8660254037844399, 0, -0.49999999999999784), z_dir=(0, -1, 0))) as fillet1_piece_7:
        with BuildLine():
            CenterArc((FILLET1_R * 3.73205080757, FILLET1_R), FILLET1_R, 120, 150)
            Line((FILLET1_R * 3.23205080757, FILLET1_R * 1.86602540378), (0, 0))
            Line((0, 0), (FILLET1_R * 3.73205080757, 0))
        make_face()
    extrude(amount=2.286)


solid = part.part
